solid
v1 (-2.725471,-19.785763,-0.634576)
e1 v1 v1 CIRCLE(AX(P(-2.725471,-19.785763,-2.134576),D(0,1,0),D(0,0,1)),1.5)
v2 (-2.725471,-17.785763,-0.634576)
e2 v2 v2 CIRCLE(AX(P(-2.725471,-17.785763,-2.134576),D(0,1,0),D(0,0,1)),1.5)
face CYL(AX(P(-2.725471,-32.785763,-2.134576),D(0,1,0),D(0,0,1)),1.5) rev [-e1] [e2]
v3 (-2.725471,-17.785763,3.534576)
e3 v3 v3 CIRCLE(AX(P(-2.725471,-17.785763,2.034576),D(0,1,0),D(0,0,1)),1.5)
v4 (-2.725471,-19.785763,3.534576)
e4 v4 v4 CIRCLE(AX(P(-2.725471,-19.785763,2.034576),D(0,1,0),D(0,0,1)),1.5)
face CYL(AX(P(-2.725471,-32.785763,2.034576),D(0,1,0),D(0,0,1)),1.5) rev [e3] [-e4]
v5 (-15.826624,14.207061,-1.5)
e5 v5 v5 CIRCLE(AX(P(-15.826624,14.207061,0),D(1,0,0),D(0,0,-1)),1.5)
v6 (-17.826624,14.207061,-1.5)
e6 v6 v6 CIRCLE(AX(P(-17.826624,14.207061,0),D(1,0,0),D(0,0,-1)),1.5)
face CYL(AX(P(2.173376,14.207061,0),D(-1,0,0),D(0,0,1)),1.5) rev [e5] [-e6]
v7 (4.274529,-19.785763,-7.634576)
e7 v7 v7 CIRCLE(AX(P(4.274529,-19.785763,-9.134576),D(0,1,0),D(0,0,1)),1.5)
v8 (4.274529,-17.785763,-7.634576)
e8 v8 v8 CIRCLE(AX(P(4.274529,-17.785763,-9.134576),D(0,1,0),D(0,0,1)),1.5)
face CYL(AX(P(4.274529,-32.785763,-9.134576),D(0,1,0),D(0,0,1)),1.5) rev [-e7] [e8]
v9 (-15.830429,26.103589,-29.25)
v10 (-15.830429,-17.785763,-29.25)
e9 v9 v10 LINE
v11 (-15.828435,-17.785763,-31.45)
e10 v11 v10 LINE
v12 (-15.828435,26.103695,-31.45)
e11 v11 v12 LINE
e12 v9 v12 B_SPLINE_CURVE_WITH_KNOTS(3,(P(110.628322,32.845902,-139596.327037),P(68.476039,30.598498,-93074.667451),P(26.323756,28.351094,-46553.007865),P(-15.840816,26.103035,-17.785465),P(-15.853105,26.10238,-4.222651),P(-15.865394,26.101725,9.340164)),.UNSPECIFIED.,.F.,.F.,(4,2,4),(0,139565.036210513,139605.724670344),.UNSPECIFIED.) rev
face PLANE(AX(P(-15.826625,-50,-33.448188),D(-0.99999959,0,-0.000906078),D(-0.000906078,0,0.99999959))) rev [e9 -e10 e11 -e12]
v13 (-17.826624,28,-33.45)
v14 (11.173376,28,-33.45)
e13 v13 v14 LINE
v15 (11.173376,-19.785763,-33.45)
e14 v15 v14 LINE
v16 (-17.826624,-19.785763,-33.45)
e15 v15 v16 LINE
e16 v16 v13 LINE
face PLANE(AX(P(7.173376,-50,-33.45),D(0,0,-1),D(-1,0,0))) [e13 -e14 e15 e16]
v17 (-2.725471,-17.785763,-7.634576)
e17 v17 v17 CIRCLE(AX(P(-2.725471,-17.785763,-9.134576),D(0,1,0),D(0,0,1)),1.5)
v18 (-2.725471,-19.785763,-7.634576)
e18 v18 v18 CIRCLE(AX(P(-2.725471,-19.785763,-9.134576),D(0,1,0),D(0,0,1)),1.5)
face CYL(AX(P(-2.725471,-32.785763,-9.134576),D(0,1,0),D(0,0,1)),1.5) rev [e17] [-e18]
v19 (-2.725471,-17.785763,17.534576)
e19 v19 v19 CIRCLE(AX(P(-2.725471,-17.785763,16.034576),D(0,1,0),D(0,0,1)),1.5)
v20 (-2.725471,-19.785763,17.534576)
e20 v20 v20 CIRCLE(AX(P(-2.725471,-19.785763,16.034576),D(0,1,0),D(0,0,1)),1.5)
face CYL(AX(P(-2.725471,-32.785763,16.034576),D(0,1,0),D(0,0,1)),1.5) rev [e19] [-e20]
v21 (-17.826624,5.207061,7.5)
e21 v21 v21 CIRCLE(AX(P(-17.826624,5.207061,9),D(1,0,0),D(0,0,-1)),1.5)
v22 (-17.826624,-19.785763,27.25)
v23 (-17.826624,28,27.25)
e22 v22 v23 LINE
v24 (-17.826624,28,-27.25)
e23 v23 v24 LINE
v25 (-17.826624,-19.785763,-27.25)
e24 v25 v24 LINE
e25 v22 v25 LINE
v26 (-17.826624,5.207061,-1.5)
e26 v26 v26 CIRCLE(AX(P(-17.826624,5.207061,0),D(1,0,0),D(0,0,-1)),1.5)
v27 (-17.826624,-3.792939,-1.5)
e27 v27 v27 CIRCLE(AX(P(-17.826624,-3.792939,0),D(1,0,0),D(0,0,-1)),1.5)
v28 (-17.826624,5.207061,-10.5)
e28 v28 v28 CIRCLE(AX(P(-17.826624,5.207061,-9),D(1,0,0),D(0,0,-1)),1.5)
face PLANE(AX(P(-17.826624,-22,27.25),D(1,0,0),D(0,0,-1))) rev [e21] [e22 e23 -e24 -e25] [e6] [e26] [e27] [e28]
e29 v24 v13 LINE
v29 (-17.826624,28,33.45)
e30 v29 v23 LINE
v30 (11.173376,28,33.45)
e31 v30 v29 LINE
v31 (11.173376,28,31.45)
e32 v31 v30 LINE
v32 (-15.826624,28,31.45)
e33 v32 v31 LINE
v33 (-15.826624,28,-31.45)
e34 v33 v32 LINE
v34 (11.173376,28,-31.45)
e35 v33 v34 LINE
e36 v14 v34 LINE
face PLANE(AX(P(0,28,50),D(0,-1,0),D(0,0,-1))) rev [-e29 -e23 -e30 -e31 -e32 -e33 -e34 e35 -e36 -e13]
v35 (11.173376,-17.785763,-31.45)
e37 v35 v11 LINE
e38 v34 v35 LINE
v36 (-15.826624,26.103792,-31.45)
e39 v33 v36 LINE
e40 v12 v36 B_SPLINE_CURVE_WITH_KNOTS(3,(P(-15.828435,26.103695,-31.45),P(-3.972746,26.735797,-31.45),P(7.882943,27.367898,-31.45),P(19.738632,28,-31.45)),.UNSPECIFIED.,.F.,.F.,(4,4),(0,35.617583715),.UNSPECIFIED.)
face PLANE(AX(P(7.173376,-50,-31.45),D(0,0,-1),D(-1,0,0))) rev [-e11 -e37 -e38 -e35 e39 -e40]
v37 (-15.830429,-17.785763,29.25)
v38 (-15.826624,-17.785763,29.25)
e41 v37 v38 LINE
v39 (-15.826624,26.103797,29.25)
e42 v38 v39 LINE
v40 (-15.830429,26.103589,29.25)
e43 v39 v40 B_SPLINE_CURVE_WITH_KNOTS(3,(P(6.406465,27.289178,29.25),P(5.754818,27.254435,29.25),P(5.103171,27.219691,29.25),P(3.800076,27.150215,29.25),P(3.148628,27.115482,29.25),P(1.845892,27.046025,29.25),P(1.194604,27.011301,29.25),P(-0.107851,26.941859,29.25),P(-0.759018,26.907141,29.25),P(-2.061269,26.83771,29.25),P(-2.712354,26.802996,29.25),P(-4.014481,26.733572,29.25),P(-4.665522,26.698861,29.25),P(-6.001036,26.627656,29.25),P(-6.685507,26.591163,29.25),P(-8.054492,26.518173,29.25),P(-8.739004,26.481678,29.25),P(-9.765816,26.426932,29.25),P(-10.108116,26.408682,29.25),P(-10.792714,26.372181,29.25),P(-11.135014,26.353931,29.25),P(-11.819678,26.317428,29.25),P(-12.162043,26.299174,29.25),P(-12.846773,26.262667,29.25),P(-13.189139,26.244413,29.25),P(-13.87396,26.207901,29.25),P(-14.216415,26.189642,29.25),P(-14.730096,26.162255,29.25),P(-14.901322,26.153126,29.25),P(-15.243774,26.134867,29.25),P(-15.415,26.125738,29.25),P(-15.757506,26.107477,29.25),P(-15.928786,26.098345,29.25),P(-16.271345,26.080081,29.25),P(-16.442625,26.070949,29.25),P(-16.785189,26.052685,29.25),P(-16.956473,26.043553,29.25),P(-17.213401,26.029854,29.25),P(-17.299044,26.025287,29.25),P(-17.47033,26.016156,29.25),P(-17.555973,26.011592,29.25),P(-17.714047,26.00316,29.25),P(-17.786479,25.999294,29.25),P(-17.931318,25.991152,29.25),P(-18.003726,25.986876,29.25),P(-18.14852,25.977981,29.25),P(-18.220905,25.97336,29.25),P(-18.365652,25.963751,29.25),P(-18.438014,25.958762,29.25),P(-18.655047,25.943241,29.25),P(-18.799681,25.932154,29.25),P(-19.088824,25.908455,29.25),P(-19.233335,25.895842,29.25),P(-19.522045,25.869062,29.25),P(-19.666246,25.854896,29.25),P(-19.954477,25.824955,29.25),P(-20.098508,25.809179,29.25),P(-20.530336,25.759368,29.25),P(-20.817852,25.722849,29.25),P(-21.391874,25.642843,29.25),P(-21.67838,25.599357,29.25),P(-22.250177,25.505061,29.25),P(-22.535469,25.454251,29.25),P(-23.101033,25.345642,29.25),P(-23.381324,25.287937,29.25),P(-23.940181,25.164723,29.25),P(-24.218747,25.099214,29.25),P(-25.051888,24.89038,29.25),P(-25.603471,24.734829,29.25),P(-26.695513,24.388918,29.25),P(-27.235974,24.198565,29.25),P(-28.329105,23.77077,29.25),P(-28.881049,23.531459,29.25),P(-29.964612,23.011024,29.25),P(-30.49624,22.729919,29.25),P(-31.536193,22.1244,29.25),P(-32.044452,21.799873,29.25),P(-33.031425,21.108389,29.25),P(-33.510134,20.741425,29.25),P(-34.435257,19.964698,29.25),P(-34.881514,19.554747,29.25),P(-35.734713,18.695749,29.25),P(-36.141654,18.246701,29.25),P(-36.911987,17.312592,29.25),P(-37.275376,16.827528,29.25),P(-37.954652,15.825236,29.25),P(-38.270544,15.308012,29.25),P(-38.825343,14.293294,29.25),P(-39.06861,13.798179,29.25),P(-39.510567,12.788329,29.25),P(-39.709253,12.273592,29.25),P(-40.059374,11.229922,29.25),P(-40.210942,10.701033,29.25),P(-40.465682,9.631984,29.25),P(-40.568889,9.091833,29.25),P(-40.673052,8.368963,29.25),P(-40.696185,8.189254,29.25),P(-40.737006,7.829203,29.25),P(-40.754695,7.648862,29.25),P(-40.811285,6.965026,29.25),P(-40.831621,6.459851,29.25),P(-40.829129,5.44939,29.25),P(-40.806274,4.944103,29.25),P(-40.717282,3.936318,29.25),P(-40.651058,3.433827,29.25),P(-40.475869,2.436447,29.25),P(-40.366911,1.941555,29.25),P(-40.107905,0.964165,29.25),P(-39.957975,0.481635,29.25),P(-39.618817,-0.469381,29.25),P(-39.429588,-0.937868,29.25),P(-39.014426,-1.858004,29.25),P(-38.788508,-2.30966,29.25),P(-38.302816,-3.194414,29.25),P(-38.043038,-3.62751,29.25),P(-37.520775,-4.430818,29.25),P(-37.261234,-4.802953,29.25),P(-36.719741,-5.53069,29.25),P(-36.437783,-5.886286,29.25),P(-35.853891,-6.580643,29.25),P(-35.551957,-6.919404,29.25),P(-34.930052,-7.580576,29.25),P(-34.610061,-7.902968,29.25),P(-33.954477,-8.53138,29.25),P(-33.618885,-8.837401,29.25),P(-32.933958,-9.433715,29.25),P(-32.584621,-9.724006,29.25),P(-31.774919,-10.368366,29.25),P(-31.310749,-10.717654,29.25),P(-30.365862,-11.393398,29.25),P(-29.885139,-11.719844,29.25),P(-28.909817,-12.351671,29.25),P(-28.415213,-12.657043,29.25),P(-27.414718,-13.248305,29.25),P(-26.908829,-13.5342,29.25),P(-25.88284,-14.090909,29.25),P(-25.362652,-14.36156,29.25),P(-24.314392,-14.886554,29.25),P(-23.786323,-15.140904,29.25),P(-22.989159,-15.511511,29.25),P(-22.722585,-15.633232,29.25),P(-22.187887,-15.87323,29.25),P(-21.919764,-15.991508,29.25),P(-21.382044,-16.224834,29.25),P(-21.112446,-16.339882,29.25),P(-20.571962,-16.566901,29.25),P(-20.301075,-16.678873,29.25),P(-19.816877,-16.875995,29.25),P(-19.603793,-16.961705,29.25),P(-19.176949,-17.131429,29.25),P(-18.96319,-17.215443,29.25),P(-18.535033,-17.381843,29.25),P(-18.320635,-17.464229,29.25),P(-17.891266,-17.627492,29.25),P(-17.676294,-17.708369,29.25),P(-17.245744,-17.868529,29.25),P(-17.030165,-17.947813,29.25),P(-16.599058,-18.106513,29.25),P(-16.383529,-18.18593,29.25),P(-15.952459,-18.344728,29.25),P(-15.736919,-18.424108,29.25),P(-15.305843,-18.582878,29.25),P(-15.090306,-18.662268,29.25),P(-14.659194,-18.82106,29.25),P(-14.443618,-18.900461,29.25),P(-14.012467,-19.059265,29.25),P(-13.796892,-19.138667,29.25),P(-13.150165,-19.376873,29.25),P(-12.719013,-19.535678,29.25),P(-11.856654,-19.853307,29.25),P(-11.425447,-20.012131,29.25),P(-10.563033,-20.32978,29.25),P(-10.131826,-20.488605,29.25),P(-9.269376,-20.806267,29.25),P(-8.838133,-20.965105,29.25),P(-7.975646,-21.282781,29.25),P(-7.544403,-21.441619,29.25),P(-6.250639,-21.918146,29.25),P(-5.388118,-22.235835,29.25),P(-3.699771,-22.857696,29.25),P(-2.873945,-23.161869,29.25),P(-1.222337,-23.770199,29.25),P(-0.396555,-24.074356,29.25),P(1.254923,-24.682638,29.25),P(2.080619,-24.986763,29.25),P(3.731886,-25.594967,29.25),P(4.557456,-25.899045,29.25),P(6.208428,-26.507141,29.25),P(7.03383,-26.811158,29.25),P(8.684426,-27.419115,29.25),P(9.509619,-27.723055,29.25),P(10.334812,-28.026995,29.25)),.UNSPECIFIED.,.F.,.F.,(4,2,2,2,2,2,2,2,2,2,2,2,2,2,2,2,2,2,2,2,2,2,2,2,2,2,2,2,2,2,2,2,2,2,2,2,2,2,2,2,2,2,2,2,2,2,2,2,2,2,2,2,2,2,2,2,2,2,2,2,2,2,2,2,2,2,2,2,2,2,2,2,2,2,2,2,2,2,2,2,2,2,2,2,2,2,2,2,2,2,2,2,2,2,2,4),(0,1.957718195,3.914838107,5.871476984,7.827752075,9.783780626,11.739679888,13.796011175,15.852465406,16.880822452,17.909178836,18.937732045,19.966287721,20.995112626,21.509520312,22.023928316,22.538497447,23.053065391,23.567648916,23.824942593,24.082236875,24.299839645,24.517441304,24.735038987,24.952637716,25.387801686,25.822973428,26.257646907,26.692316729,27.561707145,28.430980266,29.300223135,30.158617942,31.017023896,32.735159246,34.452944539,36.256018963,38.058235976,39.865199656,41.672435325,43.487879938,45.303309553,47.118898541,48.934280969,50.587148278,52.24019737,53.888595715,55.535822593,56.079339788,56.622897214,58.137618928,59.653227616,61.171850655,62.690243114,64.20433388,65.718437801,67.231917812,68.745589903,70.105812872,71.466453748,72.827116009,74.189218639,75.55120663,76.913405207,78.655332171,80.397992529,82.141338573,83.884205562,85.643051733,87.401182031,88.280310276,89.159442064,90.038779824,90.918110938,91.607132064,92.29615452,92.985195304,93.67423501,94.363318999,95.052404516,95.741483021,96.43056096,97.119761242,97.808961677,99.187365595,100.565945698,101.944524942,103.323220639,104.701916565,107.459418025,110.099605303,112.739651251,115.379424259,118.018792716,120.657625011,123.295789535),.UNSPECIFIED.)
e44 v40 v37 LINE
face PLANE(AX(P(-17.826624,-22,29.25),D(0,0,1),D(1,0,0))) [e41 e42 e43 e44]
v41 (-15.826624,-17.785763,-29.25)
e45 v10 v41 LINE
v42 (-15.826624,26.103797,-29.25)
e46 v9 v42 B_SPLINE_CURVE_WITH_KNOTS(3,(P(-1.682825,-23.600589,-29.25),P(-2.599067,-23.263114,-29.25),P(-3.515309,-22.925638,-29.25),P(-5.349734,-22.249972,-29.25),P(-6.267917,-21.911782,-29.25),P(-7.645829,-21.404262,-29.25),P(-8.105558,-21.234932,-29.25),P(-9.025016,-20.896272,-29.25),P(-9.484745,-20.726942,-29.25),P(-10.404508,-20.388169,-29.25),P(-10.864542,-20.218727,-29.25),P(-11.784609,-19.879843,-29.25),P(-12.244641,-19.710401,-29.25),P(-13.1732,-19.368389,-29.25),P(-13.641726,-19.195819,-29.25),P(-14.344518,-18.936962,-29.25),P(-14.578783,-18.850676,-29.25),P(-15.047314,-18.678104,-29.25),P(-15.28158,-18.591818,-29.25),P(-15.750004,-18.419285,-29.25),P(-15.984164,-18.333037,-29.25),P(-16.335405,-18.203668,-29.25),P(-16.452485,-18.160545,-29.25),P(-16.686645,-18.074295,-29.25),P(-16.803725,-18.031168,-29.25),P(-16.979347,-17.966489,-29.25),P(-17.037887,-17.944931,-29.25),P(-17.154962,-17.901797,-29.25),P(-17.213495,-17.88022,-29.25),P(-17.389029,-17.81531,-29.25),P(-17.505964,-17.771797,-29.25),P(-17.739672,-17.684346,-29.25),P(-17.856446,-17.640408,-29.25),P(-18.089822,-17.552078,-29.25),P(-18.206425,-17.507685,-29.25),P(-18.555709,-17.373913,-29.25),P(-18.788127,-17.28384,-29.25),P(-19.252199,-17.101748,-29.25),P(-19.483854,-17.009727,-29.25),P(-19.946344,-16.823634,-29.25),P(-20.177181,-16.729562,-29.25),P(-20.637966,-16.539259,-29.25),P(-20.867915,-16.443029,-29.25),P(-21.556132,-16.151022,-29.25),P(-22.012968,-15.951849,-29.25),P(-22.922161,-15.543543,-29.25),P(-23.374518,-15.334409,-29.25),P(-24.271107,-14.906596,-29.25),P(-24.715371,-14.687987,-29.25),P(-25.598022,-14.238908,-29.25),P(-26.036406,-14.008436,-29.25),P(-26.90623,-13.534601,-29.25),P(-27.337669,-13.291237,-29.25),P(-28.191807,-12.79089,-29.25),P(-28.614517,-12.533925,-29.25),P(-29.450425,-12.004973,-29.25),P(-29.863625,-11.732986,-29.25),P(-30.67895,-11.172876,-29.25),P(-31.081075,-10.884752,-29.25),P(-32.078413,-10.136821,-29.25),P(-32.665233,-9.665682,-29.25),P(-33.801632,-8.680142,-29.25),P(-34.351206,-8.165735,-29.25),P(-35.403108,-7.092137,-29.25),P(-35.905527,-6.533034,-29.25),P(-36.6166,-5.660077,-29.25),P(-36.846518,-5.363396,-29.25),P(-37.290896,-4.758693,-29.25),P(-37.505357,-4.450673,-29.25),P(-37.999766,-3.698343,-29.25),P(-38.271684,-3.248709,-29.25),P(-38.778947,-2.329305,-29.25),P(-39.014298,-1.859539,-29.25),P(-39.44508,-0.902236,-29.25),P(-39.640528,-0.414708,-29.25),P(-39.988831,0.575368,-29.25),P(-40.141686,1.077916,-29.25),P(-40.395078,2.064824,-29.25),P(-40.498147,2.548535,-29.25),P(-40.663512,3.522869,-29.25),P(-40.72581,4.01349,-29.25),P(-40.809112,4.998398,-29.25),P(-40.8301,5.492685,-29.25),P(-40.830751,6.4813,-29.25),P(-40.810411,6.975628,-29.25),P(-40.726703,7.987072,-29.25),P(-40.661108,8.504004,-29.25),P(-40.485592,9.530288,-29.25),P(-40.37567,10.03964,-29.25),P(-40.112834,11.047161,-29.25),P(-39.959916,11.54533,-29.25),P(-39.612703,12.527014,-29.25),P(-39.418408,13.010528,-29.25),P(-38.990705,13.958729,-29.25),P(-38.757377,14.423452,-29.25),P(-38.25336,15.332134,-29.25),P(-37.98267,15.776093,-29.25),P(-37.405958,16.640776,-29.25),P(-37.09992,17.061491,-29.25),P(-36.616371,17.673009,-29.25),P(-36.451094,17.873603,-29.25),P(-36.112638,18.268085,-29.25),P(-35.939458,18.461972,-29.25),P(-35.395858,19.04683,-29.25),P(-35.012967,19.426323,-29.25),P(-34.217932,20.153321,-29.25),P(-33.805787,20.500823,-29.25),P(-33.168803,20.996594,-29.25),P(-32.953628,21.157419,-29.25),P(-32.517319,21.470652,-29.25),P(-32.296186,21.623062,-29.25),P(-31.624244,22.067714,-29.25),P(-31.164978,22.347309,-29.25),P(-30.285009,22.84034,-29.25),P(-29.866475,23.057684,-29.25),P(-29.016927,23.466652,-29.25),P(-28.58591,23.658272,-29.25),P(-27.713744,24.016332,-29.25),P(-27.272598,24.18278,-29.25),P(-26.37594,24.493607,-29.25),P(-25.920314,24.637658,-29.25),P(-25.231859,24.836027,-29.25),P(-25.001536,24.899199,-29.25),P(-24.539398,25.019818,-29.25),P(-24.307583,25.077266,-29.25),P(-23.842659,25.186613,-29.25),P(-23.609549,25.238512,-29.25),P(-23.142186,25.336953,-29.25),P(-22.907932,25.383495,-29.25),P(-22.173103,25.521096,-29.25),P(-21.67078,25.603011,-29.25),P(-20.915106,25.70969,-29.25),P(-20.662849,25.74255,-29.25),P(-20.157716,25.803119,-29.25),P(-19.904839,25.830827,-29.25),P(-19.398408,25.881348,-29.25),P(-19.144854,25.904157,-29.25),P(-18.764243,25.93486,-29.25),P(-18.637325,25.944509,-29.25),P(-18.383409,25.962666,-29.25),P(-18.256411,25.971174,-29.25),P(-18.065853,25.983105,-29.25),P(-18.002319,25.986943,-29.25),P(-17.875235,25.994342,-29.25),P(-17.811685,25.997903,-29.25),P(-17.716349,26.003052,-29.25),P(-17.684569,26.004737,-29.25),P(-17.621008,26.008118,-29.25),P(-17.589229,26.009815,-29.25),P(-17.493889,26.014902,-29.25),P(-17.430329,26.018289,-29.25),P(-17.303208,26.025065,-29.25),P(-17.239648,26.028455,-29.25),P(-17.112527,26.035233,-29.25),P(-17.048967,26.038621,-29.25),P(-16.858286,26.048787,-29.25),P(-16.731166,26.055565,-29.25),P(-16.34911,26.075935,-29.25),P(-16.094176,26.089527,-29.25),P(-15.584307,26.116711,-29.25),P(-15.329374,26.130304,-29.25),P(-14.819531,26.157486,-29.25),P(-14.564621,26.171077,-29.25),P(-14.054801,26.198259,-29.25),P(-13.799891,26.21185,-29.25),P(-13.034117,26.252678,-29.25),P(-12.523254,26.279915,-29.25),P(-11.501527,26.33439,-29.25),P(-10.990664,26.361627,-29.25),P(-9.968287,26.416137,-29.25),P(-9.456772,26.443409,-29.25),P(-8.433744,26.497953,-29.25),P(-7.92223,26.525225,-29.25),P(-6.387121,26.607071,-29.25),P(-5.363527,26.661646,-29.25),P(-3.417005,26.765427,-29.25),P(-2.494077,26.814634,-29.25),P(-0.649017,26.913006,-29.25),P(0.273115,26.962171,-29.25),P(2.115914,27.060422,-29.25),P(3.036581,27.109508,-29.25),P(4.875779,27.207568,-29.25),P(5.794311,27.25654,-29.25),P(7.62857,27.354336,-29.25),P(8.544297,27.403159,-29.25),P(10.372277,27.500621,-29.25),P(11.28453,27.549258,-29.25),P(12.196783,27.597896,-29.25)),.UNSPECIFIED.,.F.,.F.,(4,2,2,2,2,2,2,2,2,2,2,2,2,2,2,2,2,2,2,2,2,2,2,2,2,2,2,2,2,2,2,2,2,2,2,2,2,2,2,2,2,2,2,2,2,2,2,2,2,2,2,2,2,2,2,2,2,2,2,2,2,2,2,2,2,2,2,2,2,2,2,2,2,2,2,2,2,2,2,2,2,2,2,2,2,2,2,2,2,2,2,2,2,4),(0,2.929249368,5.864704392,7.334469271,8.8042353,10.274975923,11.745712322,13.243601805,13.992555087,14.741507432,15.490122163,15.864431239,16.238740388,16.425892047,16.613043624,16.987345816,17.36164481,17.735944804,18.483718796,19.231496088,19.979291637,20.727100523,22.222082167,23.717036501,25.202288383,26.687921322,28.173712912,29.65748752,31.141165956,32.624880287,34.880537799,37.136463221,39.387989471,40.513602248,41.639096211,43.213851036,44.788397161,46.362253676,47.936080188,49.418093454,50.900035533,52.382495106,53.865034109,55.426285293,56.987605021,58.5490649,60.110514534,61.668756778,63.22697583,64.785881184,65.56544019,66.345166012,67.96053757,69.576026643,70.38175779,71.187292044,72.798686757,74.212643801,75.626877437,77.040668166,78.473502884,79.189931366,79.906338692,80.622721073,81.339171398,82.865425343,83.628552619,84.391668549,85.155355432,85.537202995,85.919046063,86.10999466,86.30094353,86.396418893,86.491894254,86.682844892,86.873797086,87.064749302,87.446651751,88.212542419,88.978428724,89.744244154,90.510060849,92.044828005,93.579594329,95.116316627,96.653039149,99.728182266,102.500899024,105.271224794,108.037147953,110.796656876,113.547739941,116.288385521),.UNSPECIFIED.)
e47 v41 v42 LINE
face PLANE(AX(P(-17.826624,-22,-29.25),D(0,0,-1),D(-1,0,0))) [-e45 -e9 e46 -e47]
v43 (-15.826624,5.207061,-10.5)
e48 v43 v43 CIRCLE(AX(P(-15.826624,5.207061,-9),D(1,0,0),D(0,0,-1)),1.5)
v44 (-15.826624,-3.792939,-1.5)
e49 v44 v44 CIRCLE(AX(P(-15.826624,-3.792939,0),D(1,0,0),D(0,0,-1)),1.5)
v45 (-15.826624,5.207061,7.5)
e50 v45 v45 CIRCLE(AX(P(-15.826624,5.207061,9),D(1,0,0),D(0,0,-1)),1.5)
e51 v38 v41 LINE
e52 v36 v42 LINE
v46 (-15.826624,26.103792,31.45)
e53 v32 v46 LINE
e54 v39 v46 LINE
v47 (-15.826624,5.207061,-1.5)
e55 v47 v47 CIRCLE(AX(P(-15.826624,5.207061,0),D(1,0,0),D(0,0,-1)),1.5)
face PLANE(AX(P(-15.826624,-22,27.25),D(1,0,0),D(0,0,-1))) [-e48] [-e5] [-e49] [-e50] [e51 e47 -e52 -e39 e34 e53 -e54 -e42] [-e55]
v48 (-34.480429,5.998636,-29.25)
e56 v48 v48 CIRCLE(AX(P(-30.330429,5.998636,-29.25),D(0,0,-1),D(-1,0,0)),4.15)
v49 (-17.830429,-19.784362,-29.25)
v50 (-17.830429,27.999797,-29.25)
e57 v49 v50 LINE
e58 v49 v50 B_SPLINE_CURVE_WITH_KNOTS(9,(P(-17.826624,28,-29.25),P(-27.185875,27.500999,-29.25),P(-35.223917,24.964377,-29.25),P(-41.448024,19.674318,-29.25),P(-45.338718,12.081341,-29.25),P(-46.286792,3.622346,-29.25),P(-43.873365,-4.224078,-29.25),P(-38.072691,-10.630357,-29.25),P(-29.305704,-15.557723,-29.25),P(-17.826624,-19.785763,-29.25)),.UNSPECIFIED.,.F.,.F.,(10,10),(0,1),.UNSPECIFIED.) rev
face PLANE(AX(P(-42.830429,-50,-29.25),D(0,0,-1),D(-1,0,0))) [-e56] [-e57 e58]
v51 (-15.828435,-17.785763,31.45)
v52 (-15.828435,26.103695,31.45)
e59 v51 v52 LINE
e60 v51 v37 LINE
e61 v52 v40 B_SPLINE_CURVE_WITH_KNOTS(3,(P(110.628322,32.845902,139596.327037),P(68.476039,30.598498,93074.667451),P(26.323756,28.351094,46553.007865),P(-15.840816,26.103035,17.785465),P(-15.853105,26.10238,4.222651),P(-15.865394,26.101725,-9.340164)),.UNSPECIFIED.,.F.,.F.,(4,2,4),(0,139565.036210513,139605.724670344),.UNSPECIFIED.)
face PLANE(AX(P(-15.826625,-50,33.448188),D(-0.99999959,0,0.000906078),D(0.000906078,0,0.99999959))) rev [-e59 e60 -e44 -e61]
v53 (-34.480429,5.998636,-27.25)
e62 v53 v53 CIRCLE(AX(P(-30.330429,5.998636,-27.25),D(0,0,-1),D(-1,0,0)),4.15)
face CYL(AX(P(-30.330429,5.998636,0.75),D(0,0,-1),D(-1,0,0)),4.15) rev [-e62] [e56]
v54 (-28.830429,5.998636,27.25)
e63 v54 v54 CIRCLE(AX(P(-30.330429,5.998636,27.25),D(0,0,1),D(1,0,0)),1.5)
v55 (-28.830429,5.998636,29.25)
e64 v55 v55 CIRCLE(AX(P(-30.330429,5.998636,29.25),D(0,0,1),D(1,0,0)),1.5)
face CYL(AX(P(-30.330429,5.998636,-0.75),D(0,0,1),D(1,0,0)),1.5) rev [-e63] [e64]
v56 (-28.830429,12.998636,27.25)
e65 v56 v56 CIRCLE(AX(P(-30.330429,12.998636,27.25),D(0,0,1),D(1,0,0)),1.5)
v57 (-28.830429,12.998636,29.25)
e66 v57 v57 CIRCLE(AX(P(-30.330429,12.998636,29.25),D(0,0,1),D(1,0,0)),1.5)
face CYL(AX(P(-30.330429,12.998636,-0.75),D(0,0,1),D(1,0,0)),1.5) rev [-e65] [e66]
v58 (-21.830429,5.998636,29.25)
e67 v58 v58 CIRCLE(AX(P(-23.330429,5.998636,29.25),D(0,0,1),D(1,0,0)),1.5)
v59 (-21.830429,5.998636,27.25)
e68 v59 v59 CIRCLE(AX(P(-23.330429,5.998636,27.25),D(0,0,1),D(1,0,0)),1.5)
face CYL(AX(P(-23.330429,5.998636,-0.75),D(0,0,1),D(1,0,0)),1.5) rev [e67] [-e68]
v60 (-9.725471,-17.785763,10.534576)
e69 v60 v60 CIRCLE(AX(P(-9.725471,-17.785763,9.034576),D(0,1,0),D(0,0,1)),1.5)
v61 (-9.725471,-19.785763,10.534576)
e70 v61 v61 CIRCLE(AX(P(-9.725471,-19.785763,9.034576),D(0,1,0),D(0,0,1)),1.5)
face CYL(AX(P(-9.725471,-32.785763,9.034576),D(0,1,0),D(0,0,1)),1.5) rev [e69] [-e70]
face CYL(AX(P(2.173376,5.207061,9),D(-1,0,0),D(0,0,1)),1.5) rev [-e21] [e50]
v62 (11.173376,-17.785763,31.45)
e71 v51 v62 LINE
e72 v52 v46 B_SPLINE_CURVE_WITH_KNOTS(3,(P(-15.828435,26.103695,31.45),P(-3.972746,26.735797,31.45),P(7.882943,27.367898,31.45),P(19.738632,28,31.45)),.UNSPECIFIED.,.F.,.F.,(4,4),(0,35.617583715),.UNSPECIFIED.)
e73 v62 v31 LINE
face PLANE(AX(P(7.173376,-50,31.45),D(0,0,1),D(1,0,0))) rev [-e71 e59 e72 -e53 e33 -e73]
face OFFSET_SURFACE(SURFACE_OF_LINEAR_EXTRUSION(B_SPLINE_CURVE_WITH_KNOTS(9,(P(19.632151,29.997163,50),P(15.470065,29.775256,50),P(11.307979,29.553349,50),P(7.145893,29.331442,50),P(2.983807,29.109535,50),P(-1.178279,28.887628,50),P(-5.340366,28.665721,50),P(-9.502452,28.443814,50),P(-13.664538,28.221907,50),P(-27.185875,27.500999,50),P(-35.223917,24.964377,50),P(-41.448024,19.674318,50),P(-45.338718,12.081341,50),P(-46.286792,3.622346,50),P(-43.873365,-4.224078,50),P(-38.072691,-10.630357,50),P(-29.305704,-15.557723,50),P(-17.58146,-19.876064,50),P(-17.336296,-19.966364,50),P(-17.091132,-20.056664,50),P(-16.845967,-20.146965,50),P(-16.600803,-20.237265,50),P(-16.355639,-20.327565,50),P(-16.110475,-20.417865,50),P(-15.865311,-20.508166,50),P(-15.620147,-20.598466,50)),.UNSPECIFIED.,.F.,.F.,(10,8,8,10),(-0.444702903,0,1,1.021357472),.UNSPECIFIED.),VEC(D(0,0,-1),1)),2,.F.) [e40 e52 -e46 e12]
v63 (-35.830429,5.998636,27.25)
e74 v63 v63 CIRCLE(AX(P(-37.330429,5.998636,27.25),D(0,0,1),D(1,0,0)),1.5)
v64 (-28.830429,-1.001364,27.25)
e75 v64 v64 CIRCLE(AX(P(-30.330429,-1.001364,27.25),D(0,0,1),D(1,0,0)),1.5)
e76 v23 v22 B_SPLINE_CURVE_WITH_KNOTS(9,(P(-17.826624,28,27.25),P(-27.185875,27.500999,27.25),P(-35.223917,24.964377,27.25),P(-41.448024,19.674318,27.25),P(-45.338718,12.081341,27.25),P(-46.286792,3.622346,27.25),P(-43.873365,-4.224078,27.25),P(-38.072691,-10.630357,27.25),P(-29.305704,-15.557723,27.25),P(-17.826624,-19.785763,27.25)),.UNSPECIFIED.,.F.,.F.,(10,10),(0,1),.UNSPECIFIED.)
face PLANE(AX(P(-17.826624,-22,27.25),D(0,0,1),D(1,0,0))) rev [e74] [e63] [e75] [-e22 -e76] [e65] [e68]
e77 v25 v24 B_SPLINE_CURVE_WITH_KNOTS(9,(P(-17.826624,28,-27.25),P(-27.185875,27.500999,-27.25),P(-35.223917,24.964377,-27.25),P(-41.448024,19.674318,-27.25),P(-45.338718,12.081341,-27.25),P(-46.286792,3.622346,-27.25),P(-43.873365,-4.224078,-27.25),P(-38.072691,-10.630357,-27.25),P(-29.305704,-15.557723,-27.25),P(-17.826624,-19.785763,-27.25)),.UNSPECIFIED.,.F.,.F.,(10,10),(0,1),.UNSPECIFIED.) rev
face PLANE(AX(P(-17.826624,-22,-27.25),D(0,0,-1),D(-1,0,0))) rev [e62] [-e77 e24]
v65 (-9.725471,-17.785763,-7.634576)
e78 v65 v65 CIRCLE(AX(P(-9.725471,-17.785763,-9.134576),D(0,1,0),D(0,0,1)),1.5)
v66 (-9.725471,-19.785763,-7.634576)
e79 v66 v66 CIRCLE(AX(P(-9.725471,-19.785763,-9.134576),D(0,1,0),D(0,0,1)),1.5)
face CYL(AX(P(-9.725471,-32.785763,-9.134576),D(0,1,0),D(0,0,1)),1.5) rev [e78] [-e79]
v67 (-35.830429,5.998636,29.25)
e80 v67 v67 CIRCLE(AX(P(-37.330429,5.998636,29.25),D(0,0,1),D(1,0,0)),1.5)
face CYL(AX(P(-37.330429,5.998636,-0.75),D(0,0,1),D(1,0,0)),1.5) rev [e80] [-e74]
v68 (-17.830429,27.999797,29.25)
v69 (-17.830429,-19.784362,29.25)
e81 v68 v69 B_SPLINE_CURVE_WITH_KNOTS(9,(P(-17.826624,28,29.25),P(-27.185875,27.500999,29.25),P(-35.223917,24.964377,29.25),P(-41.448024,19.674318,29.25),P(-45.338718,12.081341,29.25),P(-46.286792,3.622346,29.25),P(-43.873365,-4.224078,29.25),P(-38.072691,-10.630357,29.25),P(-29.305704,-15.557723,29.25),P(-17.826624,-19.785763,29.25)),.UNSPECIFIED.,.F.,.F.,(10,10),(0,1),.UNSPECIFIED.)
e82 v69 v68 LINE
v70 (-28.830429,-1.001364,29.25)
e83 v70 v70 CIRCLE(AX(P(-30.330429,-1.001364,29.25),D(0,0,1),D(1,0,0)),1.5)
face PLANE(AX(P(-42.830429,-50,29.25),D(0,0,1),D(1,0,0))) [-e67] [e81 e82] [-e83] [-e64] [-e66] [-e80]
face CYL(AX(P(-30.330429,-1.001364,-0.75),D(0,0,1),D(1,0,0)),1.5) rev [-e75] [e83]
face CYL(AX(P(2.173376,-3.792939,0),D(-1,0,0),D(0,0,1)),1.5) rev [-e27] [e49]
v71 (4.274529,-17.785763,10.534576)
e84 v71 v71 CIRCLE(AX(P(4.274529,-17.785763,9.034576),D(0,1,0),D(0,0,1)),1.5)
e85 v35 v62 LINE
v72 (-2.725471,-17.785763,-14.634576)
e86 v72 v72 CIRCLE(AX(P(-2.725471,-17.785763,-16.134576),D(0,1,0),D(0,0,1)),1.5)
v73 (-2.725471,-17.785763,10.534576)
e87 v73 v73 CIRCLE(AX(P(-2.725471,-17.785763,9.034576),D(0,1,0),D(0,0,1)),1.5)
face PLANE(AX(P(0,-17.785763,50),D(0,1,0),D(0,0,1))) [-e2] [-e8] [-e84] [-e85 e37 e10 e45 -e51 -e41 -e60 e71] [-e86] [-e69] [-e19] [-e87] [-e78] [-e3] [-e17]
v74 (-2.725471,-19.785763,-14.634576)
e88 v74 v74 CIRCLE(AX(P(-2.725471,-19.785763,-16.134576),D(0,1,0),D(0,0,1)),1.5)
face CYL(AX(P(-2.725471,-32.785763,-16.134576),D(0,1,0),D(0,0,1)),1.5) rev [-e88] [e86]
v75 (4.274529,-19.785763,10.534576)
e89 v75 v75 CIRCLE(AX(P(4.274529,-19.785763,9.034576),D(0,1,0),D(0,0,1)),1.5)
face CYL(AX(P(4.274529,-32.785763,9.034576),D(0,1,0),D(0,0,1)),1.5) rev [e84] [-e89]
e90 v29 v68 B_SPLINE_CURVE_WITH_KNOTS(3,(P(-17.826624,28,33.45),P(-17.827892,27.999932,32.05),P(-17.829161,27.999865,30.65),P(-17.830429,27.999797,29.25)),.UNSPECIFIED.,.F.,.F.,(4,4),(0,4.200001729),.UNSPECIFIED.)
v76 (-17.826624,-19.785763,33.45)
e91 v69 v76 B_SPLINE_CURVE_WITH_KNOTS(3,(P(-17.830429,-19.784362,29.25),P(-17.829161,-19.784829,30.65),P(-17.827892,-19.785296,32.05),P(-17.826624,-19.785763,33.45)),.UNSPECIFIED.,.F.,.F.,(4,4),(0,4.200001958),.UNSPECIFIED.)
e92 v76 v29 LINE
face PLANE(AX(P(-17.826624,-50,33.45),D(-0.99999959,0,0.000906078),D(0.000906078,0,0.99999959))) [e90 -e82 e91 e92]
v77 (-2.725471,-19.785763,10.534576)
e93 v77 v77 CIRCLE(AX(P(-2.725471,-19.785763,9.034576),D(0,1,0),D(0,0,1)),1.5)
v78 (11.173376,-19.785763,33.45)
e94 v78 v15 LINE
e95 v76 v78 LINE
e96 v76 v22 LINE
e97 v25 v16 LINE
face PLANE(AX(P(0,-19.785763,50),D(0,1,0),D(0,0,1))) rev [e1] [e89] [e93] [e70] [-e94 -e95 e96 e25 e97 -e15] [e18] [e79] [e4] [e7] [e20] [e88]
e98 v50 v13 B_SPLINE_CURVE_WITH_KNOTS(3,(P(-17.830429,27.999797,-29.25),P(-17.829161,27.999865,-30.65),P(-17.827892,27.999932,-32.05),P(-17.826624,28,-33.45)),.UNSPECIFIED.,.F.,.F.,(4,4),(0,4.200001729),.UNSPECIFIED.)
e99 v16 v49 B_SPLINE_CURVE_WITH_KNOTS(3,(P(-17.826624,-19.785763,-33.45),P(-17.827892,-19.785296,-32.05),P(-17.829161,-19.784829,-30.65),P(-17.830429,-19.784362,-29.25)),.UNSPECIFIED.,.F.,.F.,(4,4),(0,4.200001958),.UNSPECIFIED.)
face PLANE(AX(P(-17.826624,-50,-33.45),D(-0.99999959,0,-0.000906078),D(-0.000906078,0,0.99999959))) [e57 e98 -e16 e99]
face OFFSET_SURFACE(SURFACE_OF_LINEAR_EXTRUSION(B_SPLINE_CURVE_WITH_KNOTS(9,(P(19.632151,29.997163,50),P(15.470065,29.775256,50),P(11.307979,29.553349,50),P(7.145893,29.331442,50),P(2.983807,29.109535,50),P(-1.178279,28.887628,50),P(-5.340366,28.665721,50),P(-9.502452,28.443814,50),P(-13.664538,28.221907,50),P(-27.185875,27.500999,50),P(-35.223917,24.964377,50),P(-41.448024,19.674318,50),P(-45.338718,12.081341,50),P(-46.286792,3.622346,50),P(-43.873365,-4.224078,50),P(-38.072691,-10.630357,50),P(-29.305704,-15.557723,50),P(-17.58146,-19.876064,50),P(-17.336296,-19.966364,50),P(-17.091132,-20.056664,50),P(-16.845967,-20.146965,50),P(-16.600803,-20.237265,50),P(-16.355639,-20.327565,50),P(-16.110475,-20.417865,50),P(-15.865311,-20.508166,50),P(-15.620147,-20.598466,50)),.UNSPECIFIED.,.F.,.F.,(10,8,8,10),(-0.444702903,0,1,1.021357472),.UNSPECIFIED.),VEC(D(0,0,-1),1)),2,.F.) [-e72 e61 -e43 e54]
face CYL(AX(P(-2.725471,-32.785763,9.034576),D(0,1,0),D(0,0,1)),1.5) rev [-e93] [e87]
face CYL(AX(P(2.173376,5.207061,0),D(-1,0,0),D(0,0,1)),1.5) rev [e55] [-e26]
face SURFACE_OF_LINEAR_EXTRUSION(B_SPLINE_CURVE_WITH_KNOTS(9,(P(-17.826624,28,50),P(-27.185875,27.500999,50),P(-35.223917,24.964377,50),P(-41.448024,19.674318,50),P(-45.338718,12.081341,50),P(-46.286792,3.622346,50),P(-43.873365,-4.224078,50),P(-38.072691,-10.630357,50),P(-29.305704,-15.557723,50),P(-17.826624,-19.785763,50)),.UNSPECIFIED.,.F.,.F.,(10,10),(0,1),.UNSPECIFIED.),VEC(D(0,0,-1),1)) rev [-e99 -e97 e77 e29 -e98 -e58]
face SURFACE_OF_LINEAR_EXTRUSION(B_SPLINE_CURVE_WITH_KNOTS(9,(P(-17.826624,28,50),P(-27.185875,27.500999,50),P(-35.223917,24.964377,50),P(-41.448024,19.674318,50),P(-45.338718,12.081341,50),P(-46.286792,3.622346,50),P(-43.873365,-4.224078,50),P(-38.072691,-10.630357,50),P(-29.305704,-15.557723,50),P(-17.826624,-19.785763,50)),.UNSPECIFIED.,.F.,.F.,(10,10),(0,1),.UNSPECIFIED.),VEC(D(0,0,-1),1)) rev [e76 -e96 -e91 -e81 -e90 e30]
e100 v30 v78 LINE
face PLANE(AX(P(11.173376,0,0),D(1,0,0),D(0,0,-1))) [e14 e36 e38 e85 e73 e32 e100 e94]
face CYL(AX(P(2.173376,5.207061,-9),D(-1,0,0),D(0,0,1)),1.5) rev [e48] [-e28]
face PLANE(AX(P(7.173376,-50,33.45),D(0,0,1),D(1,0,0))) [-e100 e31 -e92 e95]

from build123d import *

# Parameters (mm, degrees)
BOSS_EXTRUDE2_START = -50
BOSS_EXTRUDE2_DEPTH = 100
FILLET2_R           = 1
SKETCH11_OUTSIDE_W  = 76.321
SKETCH11_OUTSIDE_H  = 126.318
CUT_EXTRUDE6_DEPTH  = 50
SKETCH21_W          = 25.00380553
SKETCH21_H          = 54.5
CUT_EXTRUDE18_DEPTH = 50
SKETCH14_R          = 1.5
CUT_EXTRUDE14_DEPTH = 30
SKETCH15_R          = 4.15
CUT_EXTRUDE15_DEPTH = 30
SHELL2_START        = -31.45
SHELL2_DEPTH        = 62.9
SHELL2_START_2      = -17.78576348
SHELL2_2_DEPTH      = 43.889459003
SKETCH22_W          = 62.9
SKETCH22_H          = 17.053565945
SKETCH22_H_2        = 1.226371558
SKETCH22_H_3        = 0.669933019
CUT_EXTRUDE19_DEPTH = 23
SKETCH18_R          = 1.5
CUT_EXTRUDE16_DEPTH = 30
SKETCH19_R          = 1.5
CUT_EXTRUDE17_DEPTH = 15
BOSS_EXTRUDE3_DEPTH = 4


with BuildPart() as part:
    # Boss-Extrude2: read off the stored shape, not the designer's step
    # Boss-Extrude2 outline → Boss-Extrude2 (new body)
    with BuildSketch(Plane.XY.offset(BOSS_EXTRUDE2_START)):
        with BuildLine():
            Line((7.173376116, 28), (-17.826623884, 28))
            add(Edge.make_bspline(
                [(-17.826623884, 28), (-27.185874908, 27.50099933), (-35.223916981, 24.964377467), (-41.44802417, 19.674318155), (-45.338717867, 12.08134087), (-46.286792493, 3.622346125), (-43.873364855, -4.224078001), (-38.072691487, -10.630357441), (-29.305703518, -15.557723074), (-17.826623884, -19.78576348)],
                knots=[0, 0, 0, 0, 0, 0, 0, 0, 0, 0, 1, 1, 1, 1, 1, 1, 1, 1, 1, 1], degree=9))
            Line((-17.826623884, -19.78576348), (7.173376116, -19.78576348))
            Line((7.173376116, -19.78576348), (7.173376116, 28))
        make_face()
    extrude(amount=BOSS_EXTRUDE2_DEPTH)

    # Fillet2
    # the kernel refuses this fillet: 1 mm, written as the material it takes off along each edge
    with BuildSketch(Plane(origin=(9.673376116, 28, 50), x_dir=(0, 0, -1), z_dir=(-1, 0, 0))) as fillet2_piece_1:
        with BuildLine():
            CenterArc((FILLET2_R, FILLET2_R), FILLET2_R, 180, 90)
            Line((0, FILLET2_R), (0, 0))
            Line((0, 0), (FILLET2_R, 0))
        make_face()
    extrude(amount=35, mode=Mode.SUBTRACT)
    with BuildSketch(Plane(origin=(7.173376116, -22.28576348, 50), x_dir=(0, 0, -1), z_dir=(0, 1, 0))) as fillet2_piece_2:
        with BuildLine():
            CenterArc((FILLET2_R, FILLET2_R), FILLET2_R, 180, 90)
            Line((0, FILLET2_R), (0, 0))
            Line((0, 0), (FILLET2_R, 0))
        make_face()
    extrude(amount=52.78576348, mode=Mode.SUBTRACT)

    # Sketch11 outside → Cut-Extrude6 (cut, symmetric)
    with BuildSketch(Plane(origin=(0, 0, 0), x_dir=(1, 0, 0), z_dir=(0, 1, 0))):
        with Locations((-17.8285, 0)):
            Rectangle(SKETCH11_OUTSIDE_W, SKETCH11_OUTSIDE_H)
        Polygon((7.173376116, -33.45), (7.173376116, 33.45), (-17.826623884, 33.45), (-17.830429414, 29.25), (-42.830429414, 29.25), (-42.830429414, -29.25), (-17.830429414, -29.25), (-17.826623884, -33.45), align=None, mode=Mode.SUBTRACT)
    extrude(amount=CUT_EXTRUDE6_DEPTH, both=True, mode=Mode.SUBTRACT)

    # Sketch21 → Cut-Extrude18 (cut)
    with BuildSketch(Plane(origin=(0, 28, 0), x_dir=(1, 0, 0), z_dir=(0, 1, 0))):
        with Locations((-30.328526649, 0)):
            Rectangle(SKETCH21_W, SKETCH21_H)
    extrude(amount=-CUT_EXTRUDE18_DEPTH, mode=Mode.SUBTRACT)

    # Sketch14 → Cut-Extrude14 (cut)
    with BuildSketch(Plane.XY.offset(29.25)):
        with Locations((-30.330429414, -1.001364342)):
            Circle(SKETCH14_R)
        with Locations((-30.330429414, 5.998635658)):
            Circle(SKETCH14_R)
        with Locations((-37.330429414, 5.998635658)):
            Circle(SKETCH14_R)
        with Locations((-30.330429414, 12.998635658)):
            Circle(SKETCH14_R)
        with Locations((-23.330429414, 5.998635658)):
            Circle(SKETCH14_R)
    extrude(amount=-CUT_EXTRUDE14_DEPTH, mode=Mode.SUBTRACT)

    # Sketch15 → Cut-Extrude15 (cut)
    with BuildSketch(Plane(origin=(0, 0, -29.25), x_dir=(-1, 0, 0), z_dir=(0, 0, -1))):
        with Locations((30.330429414, 5.998635658)):
            Circle(SKETCH15_R)
    extrude(amount=-CUT_EXTRUDE15_DEPTH, mode=Mode.SUBTRACT)

    # Shell2: read off the stored shape, not the designer's step
    # Shell2 outline → Shell2 (cut)
    with BuildSketch(Plane.XY.offset(SHELL2_START)):
        with BuildLine():
            Line((7.173376116, -17.78576348), (7.173376116, 27.330066981))
            add(Edge.make_bspline(
                [(7.173376116, 27.330066981), (5.64775073, 27.248726274), (4.122125344, 27.167385568), (2.596499959, 27.086044862), (1.070874573, 27.004704155), (-0.454750813, 26.923363449), (-1.980376199, 26.842022743), (-3.506001584, 26.760682036), (-5.03162697, 26.67934133), (-6.557252356, 26.598000624), (-8.082877742, 26.516659917), (-9.608503127, 26.435319211), (-11.455719773, 26.336832447), (-11.777311032, 26.31968639), (-12.098902291, 26.302540333), (-12.420493551, 26.285394276), (-12.74208481, 26.268248218), (-13.06367607, 26.251102161), (-13.385267329, 26.233956104), (-13.706858589, 26.216810047), (-14.028449848, 26.199663989), (-14.350041108, 26.182517932), (-14.671632367, 26.165371875), (-15.062673648, 26.144522999), (-15.132123669, 26.140820181), (-15.201573691, 26.137117362), (-15.271023712, 26.133414544), (-15.340473734, 26.129711725), (-15.409923755, 26.126008907), (-15.479373777, 26.122306089), (-15.548823798, 26.11860327), (-15.61827382, 26.114900452), (-15.687723841, 26.111197633), (-15.757173863, 26.107494815), (-15.826623884, 26.103791996)],
                knots=[-0.295530754, -0.295530754, -0.295530754, -0.295530754, -0.295530754, -0.295530754, -0.295530754, -0.295530754, -0.295530754, -0.295530754, -0.295530754, -0.295530754, -0.295530754, -0.078187809, -0.078187809, -0.078187809, -0.078187809, -0.078187809, -0.078187809, -0.078187809, -0.078187809, -0.078187809, -0.078187809, -0.078187809, -0.032373422, -0.032373422, -0.032373422, -0.032373422, -0.032373422, -0.032373422, -0.032373422, -0.032373422, -0.032373422, -0.032373422, -0.032373422, -0.022479465, -0.022479465, -0.022479465, -0.022479465, -0.022479465, -0.022479465, -0.022479465, -0.022479465, -0.022479465, -0.022479465, -0.022479465, -0.022479465, -0.022479465], degree=12))
            Line((-15.826623884, 26.103791996), (-15.826623884, -17.78576348))
            Line((-15.826623884, -17.78576348), (7.173376116, -17.78576348))
        make_face()
    extrude(amount=SHELL2_DEPTH, mode=Mode.SUBTRACT)

    # Shell2 2 outline → Shell2 2 (cut)
    with BuildSketch(Plane(origin=(0, 0, 0), x_dir=(1, 0, 0), z_dir=(0, 1, 0)).offset(SHELL2_START_2)):
        Polygon((-15.830428593, 29.25), (-15.826623884, 29.25), (-15.826623884, 31.45), (-15.82843522, 31.45), align=None)
        Polygon((-15.826623884, -29.25), (-15.830428593, -29.25), (-15.82843522, -31.45), (-15.826623884, -31.45), align=None)
    extrude(amount=SHELL2_2_DEPTH, mode=Mode.SUBTRACT)

    # Sketch22 → Cut-Extrude19 (cut)
    with BuildSketch(Plane(origin=(7.173376116, 0, 0), x_dir=(0, 0, -1), z_dir=(1, 0, 0))):
        with Locations((0, 36.526782973)):
            Rectangle(SKETCH22_W, SKETCH22_H)
        with Locations((0, 26.716881202)):
            Rectangle(SKETCH22_W, SKETCH22_H_2)
        with Locations((0, 27.665033491)):
            Rectangle(SKETCH22_W, SKETCH22_H_3)
    extrude(amount=-CUT_EXTRUDE19_DEPTH, mode=Mode.SUBTRACT)

    # Sketch18 → Cut-Extrude16 (cut)
    with BuildSketch(Plane.ZY.offset(27.826623884)):
        with Locations(Location((0, 5.207061298, 0), (0, 0, 180))):
            Circle(SKETCH18_R)
        with Locations(Location((-9, 5.207061298, 0), (0, 0, 180))):
            Circle(SKETCH18_R)
        with Locations(Location((0, -3.792938702, 0), (0, 0, 180))):
            Circle(SKETCH18_R)
        with Locations(Location((9, 5.207061298, 0), (0, 0, 180))):
            Circle(SKETCH18_R)
        with Locations(Location((0, 14.207061298, 0), (0, 0, 180))):
            Circle(SKETCH18_R)
    extrude(amount=-CUT_EXTRUDE16_DEPTH, mode=Mode.SUBTRACT)

    # Sketch19 → Cut-Extrude17 (cut, symmetric)
    with BuildSketch(Plane(origin=(0, -17.78576348, 0), x_dir=(1, 0, 0), z_dir=(0, 1, 0))):
        with Locations(Location((4.274529249, -9.034575671, 0), (0, 0, 270))):
            Circle(SKETCH19_R)
        with Locations(Location((-2.725470751, -16.034575671, 0), (0, 0, 270))):
            Circle(SKETCH19_R)
        with Locations(Location((-9.725470751, -9.034575671, 0), (0, 0, 270))):
            Circle(SKETCH19_R)
        with Locations(Location((-2.725470751, -9.034575671, 0), (0, 0, 270))):
            Circle(SKETCH19_R)
        with Locations(Location((-2.725470751, 16.134575671, 0), (0, 0, 270))):
            Circle(SKETCH19_R)
        with Locations(Location((4.274529249, 9.134575671, 0), (0, 0, 270))):
            Circle(SKETCH19_R)
        with Locations(Location((-2.725470751, 2.134575671, 0), (0, 0, 270))):
            Circle(SKETCH19_R)
        with Locations(Location((-9.725470751, 9.134575671, 0), (0, 0, 270))):
            Circle(SKETCH19_R)
        with Locations(Location((-2.725470751, 9.134575671, 0), (0, 0, 270))):
            Circle(SKETCH19_R)
        with Locations(Location((-2.725470751, -2.034575671, 0), (0, 0, 270))):
            Circle(SKETCH19_R)
    extrude(amount=CUT_EXTRUDE17_DEPTH, both=True, mode=Mode.SUBTRACT)

    # Sketch20 → Boss-Extrude3 (add)
    with BuildSketch(Plane(origin=(7.173376116, 0, 0), x_dir=(0, 0, -1), z_dir=(1, 0, 0))):
        Polygon((-31.45, -17.78576348), (-31.45, 28), (-33.45, 28), (-33.45, -19.78576348), (33.45, -19.78576348), (33.45, 28), (31.45, 28), (31.45, -17.78576348), align=None)
    extrude(amount=BOSS_EXTRUDE3_DEPTH)


solid = part.part
